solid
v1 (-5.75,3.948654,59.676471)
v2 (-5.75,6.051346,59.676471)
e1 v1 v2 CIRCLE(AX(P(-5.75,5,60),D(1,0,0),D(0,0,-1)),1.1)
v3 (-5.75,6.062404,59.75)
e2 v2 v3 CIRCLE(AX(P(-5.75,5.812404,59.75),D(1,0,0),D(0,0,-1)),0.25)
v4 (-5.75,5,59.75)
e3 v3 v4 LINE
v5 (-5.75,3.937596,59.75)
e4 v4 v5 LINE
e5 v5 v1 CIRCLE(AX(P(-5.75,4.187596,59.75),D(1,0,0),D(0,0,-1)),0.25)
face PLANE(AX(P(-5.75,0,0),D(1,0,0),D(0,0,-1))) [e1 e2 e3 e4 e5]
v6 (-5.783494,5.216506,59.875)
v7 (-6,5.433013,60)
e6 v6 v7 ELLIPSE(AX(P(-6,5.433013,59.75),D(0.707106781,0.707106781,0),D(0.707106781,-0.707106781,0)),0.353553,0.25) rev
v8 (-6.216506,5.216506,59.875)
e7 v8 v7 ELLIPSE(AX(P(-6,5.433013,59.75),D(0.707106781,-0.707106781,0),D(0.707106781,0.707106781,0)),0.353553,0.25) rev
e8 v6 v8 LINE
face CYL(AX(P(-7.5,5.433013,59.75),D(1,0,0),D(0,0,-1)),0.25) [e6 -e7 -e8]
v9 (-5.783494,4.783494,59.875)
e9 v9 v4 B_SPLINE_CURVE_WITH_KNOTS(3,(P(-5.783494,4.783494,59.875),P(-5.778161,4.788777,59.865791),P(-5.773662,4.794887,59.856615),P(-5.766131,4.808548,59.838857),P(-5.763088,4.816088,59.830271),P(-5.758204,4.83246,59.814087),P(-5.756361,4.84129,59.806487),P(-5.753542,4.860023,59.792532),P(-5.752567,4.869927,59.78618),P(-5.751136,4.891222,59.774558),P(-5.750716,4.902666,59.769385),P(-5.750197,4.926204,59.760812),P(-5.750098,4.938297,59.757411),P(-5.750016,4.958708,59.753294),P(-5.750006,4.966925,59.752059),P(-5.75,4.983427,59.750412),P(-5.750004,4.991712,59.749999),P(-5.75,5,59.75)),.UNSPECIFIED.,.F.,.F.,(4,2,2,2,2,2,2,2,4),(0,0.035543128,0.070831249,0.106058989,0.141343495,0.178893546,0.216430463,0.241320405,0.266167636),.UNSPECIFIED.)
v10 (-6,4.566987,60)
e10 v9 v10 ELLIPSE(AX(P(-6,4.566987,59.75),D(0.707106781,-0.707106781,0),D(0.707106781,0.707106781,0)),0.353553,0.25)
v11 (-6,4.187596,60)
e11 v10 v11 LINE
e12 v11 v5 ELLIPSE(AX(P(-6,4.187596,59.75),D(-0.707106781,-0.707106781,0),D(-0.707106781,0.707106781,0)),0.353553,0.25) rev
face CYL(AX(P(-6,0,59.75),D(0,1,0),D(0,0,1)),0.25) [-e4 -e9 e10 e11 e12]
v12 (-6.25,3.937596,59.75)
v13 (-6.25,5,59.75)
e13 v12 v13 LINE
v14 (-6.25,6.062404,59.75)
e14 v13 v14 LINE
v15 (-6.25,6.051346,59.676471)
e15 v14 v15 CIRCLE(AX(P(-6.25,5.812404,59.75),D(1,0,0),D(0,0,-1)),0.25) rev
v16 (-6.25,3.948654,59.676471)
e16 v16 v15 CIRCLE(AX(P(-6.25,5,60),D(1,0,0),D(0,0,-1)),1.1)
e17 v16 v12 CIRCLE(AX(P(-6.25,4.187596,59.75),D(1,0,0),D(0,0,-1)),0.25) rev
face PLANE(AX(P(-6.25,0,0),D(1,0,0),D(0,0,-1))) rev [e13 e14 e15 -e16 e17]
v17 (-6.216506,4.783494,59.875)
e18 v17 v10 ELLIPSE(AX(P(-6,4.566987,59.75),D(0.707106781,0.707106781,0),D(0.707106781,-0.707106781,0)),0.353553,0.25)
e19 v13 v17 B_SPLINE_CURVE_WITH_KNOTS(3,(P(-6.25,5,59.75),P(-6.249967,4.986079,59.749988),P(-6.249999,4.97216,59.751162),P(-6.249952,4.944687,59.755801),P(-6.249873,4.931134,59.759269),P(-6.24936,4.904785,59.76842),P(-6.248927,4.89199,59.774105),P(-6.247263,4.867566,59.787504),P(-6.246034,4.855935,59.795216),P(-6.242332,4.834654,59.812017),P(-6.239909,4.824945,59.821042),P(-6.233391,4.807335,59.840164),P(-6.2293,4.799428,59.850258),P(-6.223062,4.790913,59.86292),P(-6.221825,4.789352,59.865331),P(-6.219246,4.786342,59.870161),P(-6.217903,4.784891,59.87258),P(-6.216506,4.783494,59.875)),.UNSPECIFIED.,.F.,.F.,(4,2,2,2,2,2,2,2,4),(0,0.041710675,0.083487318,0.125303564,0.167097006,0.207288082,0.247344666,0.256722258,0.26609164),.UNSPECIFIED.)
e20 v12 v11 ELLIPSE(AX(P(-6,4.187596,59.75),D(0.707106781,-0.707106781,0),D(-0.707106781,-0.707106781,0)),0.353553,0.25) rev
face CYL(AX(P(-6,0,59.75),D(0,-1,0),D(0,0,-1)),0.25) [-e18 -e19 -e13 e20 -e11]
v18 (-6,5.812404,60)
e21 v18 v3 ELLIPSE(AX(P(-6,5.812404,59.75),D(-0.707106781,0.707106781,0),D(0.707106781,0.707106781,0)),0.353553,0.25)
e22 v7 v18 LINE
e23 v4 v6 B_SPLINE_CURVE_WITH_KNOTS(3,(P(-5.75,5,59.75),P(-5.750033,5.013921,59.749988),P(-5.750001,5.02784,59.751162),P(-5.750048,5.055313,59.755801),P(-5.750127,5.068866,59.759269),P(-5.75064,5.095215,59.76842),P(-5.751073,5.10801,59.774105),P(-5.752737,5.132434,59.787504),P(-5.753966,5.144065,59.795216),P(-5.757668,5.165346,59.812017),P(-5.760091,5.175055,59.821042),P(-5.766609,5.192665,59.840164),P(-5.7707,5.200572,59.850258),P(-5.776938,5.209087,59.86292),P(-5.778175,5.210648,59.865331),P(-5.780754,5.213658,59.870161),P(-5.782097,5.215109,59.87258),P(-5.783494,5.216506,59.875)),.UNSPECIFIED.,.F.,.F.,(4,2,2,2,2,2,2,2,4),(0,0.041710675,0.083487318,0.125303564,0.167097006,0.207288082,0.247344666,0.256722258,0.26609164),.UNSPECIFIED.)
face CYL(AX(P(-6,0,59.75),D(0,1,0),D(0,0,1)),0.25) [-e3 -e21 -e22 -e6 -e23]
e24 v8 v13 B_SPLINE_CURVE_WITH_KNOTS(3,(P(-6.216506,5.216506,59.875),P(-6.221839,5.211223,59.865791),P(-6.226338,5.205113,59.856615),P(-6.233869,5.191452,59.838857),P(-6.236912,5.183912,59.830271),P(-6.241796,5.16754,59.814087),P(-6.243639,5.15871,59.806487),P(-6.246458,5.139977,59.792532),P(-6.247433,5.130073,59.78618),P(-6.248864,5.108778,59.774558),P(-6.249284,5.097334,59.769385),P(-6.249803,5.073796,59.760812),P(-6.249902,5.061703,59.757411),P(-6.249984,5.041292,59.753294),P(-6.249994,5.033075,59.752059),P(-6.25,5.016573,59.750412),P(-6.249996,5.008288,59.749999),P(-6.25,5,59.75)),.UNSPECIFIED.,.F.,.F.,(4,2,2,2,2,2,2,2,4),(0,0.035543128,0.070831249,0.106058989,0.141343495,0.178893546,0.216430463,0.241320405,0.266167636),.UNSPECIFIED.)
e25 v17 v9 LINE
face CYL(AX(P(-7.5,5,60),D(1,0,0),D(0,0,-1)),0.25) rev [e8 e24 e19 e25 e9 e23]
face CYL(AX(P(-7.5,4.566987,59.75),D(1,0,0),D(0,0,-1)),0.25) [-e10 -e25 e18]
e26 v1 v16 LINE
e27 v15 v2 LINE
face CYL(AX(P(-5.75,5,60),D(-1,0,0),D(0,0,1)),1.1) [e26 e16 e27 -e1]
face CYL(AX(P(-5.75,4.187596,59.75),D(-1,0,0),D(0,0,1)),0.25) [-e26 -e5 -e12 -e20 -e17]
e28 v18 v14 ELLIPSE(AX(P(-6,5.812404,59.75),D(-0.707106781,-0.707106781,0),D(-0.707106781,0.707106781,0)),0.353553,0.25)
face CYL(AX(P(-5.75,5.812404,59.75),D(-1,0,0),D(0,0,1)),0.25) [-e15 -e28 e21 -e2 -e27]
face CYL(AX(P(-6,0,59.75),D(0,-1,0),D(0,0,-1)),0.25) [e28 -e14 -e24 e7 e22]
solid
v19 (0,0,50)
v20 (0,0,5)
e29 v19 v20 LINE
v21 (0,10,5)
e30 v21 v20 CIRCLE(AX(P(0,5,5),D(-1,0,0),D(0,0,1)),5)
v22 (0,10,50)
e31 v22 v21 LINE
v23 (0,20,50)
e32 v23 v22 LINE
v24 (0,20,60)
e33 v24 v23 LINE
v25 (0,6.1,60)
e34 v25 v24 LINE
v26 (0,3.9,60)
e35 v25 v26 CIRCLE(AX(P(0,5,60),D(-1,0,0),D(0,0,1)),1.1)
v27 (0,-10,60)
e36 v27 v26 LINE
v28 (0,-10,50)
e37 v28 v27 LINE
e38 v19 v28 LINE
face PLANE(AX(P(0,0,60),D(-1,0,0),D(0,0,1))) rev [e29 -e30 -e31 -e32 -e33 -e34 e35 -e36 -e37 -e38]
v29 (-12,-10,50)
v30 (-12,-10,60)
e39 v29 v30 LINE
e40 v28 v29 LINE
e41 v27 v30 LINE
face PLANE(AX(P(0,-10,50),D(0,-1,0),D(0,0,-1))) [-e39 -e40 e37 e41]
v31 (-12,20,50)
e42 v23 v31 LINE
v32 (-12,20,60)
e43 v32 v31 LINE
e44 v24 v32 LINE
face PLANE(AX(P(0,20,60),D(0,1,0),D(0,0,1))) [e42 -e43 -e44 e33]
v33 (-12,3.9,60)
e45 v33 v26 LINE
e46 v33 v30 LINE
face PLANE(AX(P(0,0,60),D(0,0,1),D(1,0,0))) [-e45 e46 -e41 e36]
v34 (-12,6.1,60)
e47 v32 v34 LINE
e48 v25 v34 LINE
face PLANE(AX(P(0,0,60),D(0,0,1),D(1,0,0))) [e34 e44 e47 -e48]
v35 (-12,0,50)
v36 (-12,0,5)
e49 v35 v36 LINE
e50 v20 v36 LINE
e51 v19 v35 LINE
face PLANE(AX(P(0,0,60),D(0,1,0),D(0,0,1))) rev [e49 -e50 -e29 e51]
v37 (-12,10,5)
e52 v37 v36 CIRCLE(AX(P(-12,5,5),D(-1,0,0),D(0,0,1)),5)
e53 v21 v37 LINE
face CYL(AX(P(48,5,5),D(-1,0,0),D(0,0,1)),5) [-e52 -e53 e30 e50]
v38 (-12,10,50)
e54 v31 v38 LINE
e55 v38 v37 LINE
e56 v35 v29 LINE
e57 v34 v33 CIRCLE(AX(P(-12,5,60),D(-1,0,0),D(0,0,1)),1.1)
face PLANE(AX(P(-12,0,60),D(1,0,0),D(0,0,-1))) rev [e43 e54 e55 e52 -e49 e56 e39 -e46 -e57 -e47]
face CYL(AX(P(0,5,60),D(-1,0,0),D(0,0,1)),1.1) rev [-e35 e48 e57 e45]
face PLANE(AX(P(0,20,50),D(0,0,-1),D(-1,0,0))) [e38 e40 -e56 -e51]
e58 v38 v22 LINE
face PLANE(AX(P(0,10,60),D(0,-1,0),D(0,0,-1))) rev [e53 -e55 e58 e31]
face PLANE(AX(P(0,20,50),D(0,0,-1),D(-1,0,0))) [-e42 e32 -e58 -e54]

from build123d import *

# Parameters (mm, degrees)
SKETCH_1_W          = 12
SKETCH_1_H          = 10
EXTRUDE_1_DEPTH     = 60
CUT_EXTRUDE_3_DEPTH = 60
EXTRUDE_2_DEPTH     = 12
SKETCH_4_R          = 1.1
CUT_EXTRUDE_4_DEPTH = 12
EXTRUDE_3_DEPTH     = 0.25
SKETCH_6_R          = 0.25
CUT_EXTRUDE_5_DEPTH = 1.5
FILLET_1_R          = 0.25


with BuildPart() as part:
    # 草图1 → 凸台-拉伸1 (new body)
    with BuildSketch(Plane.XY):
        with Locations((-6, 5)):
            Rectangle(SKETCH_1_W, SKETCH_1_H)
    extrude(amount=EXTRUDE_1_DEPTH)

    # 草图2 → 切除-拉伸3 (cut)
    with BuildSketch(Plane.ZY.offset(12)):
        with BuildLine():
            ThreePointArc((0, 5), (1.464466094, 8.535533906), (5, 10))
            Line((5, 10), (0, 10))
            Line((0, 10), (0, 5))
        make_face()
        with BuildLine():
            ThreePointArc((5, 0), (1.464466094, 1.464466094), (0, 5))
            Line((0, 5), (0, 0))
            Line((0, 0), (5, 0))
        make_face()
    extrude(amount=-CUT_EXTRUDE_3_DEPTH, mode=Mode.SUBTRACT)

    # 草图3 → 凸台-拉伸2 (add)
    with BuildSketch(Plane.ZY.offset(12)):
        Polygon((60, 5), (60, 20), (50, 20), (50, -10), (60, -10), align=None)
    extrude(amount=-EXTRUDE_2_DEPTH)

    # 草图4 → 切除-拉伸4 (cut)
    with BuildSketch(Plane.ZY.offset(12)):
        with Locations((60, 5)):
            Circle(SKETCH_4_R)
    extrude(amount=-CUT_EXTRUDE_4_DEPTH, mode=Mode.SUBTRACT)


with BuildPart() as body_2:
    # 草图5 → 凸台-拉伸3 (new, symmetric)
    with BuildSketch(Plane(origin=(-6, 0, 0), x_dir=(0, 0, -1), z_dir=(1, 0, 0))):
        with BuildLine():
            Line((-60, 3.9), (-60, 4.75))
            Line((-60, 4.75), (-60, 5.25))
            Line((-60, 5.25), (-60, 6.1))
            ThreePointArc((-60, 6.1), (-58.9, 5), (-60, 3.9))
        make_face()
    extrude(amount=EXTRUDE_3_DEPTH, both=True)

    # 草图6 → 切除-拉伸5 (cut, symmetric)
    with BuildSketch(Plane(origin=(-6, 0, 0), x_dir=(0, 0, -1), z_dir=(1, 0, 0))):
        with Locations((-60, 5)):
            Circle(SKETCH_6_R)
    extrude(amount=CUT_EXTRUDE_5_DEPTH, both=True, mode=Mode.SUBTRACT)

    # 圆角1
    fillet_1_edges = [body_2.edges().sort_by_distance(p)[0] for p in [
        (-6.25, 4.325, 60),
        (-6.25, 5.675, 60),
        (-6, 6.1, 60),
        (-6, 3.9, 60),
        (-5.75, 4.325, 60),
        (-5.75, 5.675, 60),
        (-6, 5.25, 60),
        (-6, 4.75, 60),
    ]]
    fillet(fillet_1_edges, radius=FILLET_1_R - 0.0001)  # a hair under: the kernel refuses the full size


solid = Compound([part.part, body_2.part])
